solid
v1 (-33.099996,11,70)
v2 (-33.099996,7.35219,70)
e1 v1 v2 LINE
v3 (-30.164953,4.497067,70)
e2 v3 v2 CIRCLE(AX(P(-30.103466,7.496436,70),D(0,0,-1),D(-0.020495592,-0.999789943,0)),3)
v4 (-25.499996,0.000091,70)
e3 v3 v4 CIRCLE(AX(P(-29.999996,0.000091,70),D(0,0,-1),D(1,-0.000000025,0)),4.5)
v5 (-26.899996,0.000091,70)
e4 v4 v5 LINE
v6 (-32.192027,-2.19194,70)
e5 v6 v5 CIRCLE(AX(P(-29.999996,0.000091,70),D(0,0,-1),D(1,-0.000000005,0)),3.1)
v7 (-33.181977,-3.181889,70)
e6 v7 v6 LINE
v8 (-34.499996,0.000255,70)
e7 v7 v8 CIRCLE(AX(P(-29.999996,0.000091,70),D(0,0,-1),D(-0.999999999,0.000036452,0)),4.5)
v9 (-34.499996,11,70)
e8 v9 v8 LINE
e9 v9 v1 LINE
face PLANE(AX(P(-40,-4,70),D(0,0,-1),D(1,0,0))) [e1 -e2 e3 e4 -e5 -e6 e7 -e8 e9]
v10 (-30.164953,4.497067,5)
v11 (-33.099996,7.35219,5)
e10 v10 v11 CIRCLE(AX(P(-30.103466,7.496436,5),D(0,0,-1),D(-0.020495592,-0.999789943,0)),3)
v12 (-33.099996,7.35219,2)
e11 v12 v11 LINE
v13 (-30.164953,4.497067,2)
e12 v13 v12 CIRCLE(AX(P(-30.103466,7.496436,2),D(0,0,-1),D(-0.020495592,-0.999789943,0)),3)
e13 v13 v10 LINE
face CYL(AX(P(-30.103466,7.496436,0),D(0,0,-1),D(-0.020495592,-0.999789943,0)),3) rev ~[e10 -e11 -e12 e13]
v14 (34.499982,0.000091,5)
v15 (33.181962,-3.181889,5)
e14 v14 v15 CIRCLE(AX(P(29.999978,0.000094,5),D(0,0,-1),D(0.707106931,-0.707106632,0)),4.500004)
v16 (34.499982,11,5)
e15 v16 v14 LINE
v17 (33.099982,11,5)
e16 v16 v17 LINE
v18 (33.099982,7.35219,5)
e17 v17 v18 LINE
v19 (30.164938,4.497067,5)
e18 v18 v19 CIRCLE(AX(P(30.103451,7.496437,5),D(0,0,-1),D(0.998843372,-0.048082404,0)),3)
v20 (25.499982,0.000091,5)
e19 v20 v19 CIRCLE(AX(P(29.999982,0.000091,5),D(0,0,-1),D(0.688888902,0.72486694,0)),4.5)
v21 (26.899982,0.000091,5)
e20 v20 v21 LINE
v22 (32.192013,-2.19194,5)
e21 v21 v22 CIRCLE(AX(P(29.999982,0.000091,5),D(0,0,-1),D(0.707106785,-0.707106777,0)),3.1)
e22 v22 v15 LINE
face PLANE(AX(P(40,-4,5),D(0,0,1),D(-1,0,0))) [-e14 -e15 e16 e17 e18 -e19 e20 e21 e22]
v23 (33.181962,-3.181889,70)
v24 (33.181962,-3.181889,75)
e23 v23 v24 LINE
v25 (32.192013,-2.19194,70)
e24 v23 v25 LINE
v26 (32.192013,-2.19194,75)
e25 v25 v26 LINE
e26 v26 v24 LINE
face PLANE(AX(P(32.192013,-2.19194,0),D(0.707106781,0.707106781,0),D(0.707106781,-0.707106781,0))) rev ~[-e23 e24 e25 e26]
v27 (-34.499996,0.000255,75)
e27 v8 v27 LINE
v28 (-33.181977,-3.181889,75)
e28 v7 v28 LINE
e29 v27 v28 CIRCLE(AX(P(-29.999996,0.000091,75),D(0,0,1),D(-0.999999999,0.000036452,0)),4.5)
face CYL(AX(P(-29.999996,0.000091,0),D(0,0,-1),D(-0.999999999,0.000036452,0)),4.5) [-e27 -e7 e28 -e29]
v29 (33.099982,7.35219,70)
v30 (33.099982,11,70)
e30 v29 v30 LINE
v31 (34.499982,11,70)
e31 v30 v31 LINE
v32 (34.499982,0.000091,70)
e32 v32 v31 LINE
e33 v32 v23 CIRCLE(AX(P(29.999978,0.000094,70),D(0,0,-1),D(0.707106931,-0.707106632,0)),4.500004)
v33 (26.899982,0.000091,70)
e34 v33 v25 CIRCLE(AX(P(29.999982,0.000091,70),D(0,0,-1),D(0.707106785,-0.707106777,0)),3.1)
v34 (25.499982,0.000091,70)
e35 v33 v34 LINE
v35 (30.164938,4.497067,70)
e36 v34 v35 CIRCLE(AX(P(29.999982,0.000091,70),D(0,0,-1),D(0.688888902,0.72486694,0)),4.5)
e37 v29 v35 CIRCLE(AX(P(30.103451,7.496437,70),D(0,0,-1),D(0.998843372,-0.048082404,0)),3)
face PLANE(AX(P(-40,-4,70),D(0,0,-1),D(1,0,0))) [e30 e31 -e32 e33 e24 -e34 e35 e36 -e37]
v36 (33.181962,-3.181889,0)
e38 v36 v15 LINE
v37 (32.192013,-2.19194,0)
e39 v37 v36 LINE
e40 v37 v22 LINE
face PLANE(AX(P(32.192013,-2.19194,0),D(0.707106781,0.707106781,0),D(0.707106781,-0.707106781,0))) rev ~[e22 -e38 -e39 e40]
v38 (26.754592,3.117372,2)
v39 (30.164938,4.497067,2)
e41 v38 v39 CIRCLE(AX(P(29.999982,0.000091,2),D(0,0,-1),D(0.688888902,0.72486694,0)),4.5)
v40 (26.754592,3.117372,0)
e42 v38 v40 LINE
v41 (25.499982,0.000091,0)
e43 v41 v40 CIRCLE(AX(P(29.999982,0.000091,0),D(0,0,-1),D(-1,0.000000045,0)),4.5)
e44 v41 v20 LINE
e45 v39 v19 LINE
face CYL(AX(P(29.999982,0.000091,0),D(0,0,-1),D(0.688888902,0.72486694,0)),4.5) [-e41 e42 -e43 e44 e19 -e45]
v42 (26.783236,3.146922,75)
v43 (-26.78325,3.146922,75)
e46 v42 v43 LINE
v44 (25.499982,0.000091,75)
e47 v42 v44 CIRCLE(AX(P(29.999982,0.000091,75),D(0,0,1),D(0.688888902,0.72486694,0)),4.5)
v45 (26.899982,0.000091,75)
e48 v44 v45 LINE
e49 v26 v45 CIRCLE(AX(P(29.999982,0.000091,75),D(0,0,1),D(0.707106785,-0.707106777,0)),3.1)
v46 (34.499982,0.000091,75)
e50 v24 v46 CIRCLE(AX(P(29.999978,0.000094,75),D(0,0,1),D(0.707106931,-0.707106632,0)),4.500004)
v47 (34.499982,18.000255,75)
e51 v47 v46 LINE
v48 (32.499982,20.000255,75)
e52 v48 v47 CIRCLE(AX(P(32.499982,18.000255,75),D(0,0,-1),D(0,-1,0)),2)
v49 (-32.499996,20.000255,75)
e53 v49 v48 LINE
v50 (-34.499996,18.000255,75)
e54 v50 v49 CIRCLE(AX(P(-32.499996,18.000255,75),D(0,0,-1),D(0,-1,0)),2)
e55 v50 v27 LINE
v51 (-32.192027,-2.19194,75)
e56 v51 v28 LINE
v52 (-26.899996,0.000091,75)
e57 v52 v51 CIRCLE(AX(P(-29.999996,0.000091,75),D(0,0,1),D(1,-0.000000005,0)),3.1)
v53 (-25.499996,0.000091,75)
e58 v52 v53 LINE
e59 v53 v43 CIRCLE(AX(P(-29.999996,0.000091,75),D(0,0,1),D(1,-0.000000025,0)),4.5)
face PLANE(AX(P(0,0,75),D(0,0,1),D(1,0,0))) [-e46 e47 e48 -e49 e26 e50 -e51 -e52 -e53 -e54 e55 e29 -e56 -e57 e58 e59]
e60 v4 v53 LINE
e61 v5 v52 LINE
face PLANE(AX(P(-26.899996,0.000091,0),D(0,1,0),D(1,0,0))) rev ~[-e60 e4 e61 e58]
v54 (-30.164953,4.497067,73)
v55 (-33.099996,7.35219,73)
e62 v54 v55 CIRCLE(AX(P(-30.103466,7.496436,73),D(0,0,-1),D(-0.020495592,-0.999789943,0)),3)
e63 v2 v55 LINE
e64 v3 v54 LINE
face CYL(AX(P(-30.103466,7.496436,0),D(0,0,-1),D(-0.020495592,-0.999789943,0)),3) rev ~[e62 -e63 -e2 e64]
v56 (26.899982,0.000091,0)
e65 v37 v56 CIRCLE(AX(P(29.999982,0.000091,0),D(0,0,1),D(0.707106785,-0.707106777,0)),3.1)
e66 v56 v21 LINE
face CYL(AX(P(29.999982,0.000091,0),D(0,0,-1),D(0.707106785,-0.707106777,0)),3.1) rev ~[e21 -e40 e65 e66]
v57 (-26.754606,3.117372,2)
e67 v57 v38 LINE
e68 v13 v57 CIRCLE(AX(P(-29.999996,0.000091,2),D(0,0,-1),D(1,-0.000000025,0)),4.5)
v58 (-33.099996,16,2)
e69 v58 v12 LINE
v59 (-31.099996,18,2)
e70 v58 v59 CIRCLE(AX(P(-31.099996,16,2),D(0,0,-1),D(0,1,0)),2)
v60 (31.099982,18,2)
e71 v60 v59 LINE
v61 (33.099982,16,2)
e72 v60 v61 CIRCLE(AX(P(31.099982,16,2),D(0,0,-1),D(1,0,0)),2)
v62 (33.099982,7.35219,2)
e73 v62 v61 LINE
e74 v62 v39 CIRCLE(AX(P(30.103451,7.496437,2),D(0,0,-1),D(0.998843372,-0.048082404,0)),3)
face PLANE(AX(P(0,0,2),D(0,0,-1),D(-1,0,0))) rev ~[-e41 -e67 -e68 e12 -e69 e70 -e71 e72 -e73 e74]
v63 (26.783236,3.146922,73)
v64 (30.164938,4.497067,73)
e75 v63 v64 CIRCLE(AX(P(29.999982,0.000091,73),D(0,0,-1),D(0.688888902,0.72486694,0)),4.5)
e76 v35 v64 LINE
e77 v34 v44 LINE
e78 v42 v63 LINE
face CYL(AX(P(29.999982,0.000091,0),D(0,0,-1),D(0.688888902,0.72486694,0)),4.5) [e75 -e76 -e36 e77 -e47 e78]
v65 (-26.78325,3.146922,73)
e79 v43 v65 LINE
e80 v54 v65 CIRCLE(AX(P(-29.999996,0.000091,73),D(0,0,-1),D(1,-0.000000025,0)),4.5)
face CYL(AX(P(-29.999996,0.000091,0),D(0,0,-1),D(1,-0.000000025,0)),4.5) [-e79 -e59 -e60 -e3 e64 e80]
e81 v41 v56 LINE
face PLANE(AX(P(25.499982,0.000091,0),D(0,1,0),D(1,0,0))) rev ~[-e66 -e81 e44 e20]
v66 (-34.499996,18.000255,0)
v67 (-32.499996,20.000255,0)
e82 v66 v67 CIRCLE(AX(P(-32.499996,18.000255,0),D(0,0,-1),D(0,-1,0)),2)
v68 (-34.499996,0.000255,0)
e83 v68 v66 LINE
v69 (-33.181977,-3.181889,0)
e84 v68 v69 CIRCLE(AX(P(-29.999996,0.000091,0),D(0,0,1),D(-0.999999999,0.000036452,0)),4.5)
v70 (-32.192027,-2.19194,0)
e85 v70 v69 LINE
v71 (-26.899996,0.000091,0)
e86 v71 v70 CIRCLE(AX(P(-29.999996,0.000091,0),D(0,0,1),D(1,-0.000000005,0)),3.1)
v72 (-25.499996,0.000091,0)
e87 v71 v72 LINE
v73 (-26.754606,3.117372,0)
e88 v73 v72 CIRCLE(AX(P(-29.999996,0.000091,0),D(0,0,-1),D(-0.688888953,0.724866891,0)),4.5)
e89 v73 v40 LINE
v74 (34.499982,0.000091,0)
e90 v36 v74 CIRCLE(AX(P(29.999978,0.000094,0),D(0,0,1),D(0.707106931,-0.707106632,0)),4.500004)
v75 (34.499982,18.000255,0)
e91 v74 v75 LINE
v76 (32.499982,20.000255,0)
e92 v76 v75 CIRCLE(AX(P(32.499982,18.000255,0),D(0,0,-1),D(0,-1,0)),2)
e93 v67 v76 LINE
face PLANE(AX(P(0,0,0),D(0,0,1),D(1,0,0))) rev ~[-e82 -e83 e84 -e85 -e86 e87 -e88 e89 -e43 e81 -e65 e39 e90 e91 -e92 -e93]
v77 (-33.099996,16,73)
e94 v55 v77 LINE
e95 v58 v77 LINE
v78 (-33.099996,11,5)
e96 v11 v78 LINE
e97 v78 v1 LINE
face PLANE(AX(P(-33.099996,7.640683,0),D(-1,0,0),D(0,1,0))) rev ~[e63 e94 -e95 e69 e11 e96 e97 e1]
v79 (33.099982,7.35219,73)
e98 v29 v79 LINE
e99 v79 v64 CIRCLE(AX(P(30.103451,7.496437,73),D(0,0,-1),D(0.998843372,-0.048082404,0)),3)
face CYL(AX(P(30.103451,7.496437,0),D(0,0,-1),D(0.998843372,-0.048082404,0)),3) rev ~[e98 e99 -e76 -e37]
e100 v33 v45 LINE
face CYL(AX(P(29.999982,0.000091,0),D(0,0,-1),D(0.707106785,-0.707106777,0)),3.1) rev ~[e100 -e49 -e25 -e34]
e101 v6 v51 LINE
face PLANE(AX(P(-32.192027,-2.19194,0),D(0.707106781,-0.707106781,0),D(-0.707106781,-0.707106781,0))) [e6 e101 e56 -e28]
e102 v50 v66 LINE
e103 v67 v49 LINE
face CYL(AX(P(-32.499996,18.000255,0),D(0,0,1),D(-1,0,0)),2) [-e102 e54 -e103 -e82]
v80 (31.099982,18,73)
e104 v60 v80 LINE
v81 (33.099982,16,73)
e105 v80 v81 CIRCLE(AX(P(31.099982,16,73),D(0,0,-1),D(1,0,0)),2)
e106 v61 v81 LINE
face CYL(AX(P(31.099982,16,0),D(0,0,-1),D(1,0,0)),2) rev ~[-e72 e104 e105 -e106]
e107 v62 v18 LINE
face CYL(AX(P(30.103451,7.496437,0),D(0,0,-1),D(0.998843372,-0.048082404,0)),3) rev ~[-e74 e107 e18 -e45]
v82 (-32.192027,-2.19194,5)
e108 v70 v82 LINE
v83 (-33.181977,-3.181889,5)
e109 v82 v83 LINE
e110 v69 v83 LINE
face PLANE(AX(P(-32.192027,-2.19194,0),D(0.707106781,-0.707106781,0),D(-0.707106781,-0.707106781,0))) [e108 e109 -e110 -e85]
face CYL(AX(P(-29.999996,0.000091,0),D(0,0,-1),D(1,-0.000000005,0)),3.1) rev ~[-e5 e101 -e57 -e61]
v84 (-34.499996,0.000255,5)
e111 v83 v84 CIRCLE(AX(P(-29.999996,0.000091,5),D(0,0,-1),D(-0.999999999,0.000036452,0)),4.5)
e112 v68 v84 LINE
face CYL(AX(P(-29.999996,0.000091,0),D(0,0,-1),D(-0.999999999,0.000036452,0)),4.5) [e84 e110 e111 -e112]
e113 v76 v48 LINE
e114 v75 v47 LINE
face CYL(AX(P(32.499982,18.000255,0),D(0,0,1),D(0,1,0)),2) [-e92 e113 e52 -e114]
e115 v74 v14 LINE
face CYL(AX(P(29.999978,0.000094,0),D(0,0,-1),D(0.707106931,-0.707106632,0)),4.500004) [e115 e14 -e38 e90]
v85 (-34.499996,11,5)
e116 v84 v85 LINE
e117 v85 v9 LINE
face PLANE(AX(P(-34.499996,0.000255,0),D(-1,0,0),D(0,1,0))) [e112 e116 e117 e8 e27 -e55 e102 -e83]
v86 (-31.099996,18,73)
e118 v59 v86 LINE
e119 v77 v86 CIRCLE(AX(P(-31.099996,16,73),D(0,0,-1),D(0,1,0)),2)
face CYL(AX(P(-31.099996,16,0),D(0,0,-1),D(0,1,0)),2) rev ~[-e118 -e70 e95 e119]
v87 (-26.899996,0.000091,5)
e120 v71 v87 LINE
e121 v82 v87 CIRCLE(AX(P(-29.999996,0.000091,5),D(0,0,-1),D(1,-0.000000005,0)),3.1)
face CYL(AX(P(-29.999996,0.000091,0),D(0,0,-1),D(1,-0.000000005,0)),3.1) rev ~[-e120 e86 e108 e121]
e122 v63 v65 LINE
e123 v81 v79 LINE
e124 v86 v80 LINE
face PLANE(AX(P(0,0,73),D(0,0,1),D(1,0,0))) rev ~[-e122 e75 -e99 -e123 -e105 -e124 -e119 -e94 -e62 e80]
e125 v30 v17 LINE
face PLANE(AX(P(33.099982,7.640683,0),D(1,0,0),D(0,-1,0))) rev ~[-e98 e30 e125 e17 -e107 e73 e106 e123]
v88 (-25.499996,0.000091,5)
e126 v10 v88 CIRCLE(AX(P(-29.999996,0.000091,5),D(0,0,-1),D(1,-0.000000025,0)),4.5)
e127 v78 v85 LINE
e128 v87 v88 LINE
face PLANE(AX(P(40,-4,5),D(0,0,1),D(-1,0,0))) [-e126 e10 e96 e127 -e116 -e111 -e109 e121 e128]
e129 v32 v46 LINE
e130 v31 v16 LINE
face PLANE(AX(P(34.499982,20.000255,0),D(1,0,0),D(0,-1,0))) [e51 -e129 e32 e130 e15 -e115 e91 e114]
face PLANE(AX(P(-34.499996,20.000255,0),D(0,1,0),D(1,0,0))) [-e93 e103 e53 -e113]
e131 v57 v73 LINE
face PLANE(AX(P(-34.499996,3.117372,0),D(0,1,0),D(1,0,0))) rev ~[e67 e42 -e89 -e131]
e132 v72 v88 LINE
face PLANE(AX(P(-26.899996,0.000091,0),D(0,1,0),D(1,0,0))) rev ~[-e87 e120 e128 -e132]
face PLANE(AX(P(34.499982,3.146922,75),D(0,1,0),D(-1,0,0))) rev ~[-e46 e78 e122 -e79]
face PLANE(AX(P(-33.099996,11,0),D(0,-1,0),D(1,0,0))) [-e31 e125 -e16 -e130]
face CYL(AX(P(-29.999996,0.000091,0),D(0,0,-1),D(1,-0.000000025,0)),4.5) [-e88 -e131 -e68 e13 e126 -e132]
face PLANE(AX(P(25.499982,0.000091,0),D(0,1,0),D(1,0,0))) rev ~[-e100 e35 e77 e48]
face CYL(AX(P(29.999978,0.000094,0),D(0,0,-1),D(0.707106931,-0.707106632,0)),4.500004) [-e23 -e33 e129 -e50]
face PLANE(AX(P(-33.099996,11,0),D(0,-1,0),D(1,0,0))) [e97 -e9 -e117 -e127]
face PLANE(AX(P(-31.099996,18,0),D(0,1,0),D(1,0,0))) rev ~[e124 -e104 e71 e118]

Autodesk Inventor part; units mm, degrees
ref_plane "YZ Plane" through (0, 0, 0) normal (1, 0, 0) x (0, 1, 0)
ref_plane "XZ Plane" through (0, 0, 0) normal (0, 1, 0) x (-1, 0, 0)
ref_plane "XY Plane" through (0, 0, 0) normal (0, 0, 1) x (1, 0, 0)
sketch "Sketch1" plane through (0, 0, 0) normal (0, 0, 1) x (1, 0, 0)
  arc A0 (-26.899996, 0.000091) -> (-32.192027, -2.19194) centre (-29.999996, 0.000091) ccw
  arc A1 (32.192013, -2.19194) -> (26.899982, 0.000091) centre (29.999982, 0.000091) ccw
  arc A2 (-25.499996, 0.000091) -> (-33.099996, 3.261992) centre (-29.999996, 0.000091) ccw
  arc A3 (33.181962, -3.181889) -> (34.499982, 0.000091) centre (29.999982, 0.000091) ccw
  line L0 (-29.999996, 0.000091) -> (-35.729952, -5.729865)
  line L1 (-29.999996, 0.000091) -> (-21.896614, 0.000091) construction
  line L2 (29.999982, 0.000091) -> (35.185041, -5.184968)
  line L3 (29.999982, 0.000091) -> (37.332763, 0.000091) construction
  line L4 (-29.999996, 0.000091) -> (29.999982, 0.000091)
  line L5 (-34.499996, 0.000255) -> (-34.499996, 20.000255)
  line L6 (-34.499996, 20.000255) -> (34.499982, 20.000255)
  line L7 (34.499982, 20.000255) -> (34.499982, 0.000091)
  line L8 (-31.099996, 18) -> (31.099982, 18)
  line L9 (33.099982, 16) -> (33.099982, 3.261992)
  arc A4 (-33.099996, 3.261992) -> (-34.499996, 0.000091) centre (-29.999996, 0.000091) ccw
  line L10 (-33.099996, 3.261992) -> (-33.099996, 16)
  arc A5 (33.099982, 3.261992) -> (25.499982, 0.000091) centre (29.999982, 0.000091) ccw
  arc A6 (-34.499996, -0.000073) -> (-33.181977, -3.181889) centre (-29.999996, 0.000091) ccw
  arc A7 (-34.499996, 0.000091) -> (-34.499996, -0.000073) centre (-29.999996, 0.000091) ccw
  arc A8 (-33.099996, 7.640683) -> (-29.95922, 4.499906) centre (-30.103466, 7.496437) ccw
  line L11 (-29.95922, 4.499906) -> (-33.099996, 7.640683) construction
  line L12 (-29.95922, 4.499906) -> (-25.517491, 4.499906) construction
  arc A9 (29.959205, 4.499906) -> (33.099982, 7.640683) centre (30.103452, 7.496437) ccw
  line L13 (29.959205, 4.499906) -> (33.099982, 7.640683) construction
  line L14 (29.959205, 4.499906) -> (34.400934, 4.499906) construction
  arc A10 (-31.099996, 18) -> (-33.099996, 16) centre (-31.099996, 16) ccw
  arc A11 (33.099982, 16) -> (31.099982, 18) centre (31.099982, 16) ccw
  point P0 (0, 0)
  point P1 (-33.099996, 18)
  point P2 (33.099982, 18)
  point P3 (-30.164953, 4.497067)
  point P4 (-33.099996, 7.35219)
  point P5 (33.099982, 7.35219)
  point P6 (30.164938, 4.497067)
  dimension "d0" = 6.2
  dimension "d1" = 6.2
  dimension "d2" = 9
  dimension "d3" = 9
  dimension "d4" = 135
  dimension "d5" = 45
  dimension "d6" = 20
  dimension "d17" = 135
  dimension "d18" = 3
  dimension "d19" = 45
  dimension "d20" = 3
  dimension "d23" = 2
extrude "Extrusion1" add sketch "Sketch1" along normal blind 75 contours A0 L0 A6 A4 A2 A8 L4 | A8 A2 | A5 A9 L9 A11 L8 A10 L10 A4 L5 L6 L7 A3 L2 A1 L4 | A5 A9
fillet "Fillet1" radius 2 2 edges at (-34.5, 20.0003, 37.5) (34.5, 20.0003, 37.5)
sketch "Sketch1 outline for Extrusion3" plane through (0, 0, 0) normal (0, 0, 1) x (1, 0, 0)
  arc A0 (-30.164953, 4.497067) -> (-33.099996, 7.35219) centre (-30.103466, 7.496437) cw
  arc A1 (-33.099996, 3.261992) -> (-30.164953, 4.497067) centre (-29.999996, 0.000091) cw
  line L0 (-33.099996, 7.35219) -> (-33.099996, 3.261992)
  arc A2 (33.099982, 7.35219) -> (30.164938, 4.497067) centre (30.103452, 7.496437) cw
  line L1 (33.099982, 3.261992) -> (33.099982, 7.35219)
  arc A3 (30.164938, 4.497067) -> (33.099982, 3.261992) centre (29.999982, 0.000091) cw
extrude "Extrusion3" add sketch "Sketch1 outline for Extrusion3" along normal blind 75
ref_plane "Work Plane1" through (-33.099996, -4, 0) normal (0, -1, 0) x (1, 0, 0)
sketch "Sketch2" plane through (-33.099996, -4, 0) normal (0, -1, 0) x (1, 0, 0)
  line L0 (73.099996, 5) -> (-6.900004, 5)
  line L1 (-6.900004, 5) -> (-6.900004, 70)
  line L2 (-6.900004, 70) -> (73.099996, 70)
  line L3 (73.099996, 70) -> (73.099996, 5)
  line L4 (73.099996, 5) -> (-6.900004, 70) construction
  line L5 (-6.900004, 5) -> (73.099996, 70) construction
  point P0 (33.099996, 0)
  point P1 (33.099996, 37.5)
  dimension "d12" = 80
  dimension "d13" = 65
  dimension "d14" = 37.5
extrude "Extrusion2" cut sketch "Sketch2" against normal blind 15
sketch "Sketch3" plane through (0, 0, 75) normal (0, 0, 1) x (1, 0, 0)
  line L0 (34.499982, 0.000091) -> (34.499982, 18.000255)
  line L1 (-32.499996, 20.000255) -> (32.499982, 20.000255)
  line L2 (34.499982, 18.000255) -> (34.499982, 3.146922)
  line L3 (34.499982, 3.146922) -> (-34.499996, 3.146922)
  line L4 (-34.499996, 3.146922) -> (-34.499996, 18.000255)
  arc A0 (-32.499996, 20.000255) -> (-34.499996, 18.000255) centre (-32.499996, 18.000255) ccw
  arc A1 (34.499982, 18.000255) -> (32.499982, 20.000255) centre (32.499982, 18.000255) ccw
  point P0 (0, 0)
  dimension "d24" = 2
extrude "Extrusion4" add sketch "Sketch3" against normal blind 2
sketch "Sketch4" plane through (0, 0, 0) normal (0, 0, -1) x (-1, 0, 0)
  line L0 (34.499996, 20.000255) -> (-34.499982, 20.000255)
  line L1 (-34.499982, 20.000255) -> (-34.499982, 0.000091)
  line L2 (34.499996, 0.000255) -> (34.499996, 20.000255)
  line L3 (34.499996, 18.000255) -> (34.499996, 0.000255)
  line L4 (-32.499982, 20.000255) -> (32.499996, 20.000255)
  line L5 (34.499996, 18.000255) -> (34.499996, 3.117372)
  line L6 (34.499996, 3.117372) -> (-34.499982, 3.117372)
  line L7 (-34.499982, 3.117372) -> (-34.499982, 18.000255)
  arc A0 (-32.499982, 20.000255) -> (-34.499982, 18.000255) centre (-32.499982, 18.000255) ccw
  arc A1 (34.499996, 18.000255) -> (32.499996, 20.000255) centre (32.499996, 18.000255) ccw
  point P0 (0, 0)
  point P1 (-34.499982, 3.117372)
  dimension "d27" = 2
extrude "Extrusion5" add sketch "Sketch4" against normal blind 2 contours A1 L2 L6 L1 A0 L0
properties part number "Cage60mm-Boxy"
